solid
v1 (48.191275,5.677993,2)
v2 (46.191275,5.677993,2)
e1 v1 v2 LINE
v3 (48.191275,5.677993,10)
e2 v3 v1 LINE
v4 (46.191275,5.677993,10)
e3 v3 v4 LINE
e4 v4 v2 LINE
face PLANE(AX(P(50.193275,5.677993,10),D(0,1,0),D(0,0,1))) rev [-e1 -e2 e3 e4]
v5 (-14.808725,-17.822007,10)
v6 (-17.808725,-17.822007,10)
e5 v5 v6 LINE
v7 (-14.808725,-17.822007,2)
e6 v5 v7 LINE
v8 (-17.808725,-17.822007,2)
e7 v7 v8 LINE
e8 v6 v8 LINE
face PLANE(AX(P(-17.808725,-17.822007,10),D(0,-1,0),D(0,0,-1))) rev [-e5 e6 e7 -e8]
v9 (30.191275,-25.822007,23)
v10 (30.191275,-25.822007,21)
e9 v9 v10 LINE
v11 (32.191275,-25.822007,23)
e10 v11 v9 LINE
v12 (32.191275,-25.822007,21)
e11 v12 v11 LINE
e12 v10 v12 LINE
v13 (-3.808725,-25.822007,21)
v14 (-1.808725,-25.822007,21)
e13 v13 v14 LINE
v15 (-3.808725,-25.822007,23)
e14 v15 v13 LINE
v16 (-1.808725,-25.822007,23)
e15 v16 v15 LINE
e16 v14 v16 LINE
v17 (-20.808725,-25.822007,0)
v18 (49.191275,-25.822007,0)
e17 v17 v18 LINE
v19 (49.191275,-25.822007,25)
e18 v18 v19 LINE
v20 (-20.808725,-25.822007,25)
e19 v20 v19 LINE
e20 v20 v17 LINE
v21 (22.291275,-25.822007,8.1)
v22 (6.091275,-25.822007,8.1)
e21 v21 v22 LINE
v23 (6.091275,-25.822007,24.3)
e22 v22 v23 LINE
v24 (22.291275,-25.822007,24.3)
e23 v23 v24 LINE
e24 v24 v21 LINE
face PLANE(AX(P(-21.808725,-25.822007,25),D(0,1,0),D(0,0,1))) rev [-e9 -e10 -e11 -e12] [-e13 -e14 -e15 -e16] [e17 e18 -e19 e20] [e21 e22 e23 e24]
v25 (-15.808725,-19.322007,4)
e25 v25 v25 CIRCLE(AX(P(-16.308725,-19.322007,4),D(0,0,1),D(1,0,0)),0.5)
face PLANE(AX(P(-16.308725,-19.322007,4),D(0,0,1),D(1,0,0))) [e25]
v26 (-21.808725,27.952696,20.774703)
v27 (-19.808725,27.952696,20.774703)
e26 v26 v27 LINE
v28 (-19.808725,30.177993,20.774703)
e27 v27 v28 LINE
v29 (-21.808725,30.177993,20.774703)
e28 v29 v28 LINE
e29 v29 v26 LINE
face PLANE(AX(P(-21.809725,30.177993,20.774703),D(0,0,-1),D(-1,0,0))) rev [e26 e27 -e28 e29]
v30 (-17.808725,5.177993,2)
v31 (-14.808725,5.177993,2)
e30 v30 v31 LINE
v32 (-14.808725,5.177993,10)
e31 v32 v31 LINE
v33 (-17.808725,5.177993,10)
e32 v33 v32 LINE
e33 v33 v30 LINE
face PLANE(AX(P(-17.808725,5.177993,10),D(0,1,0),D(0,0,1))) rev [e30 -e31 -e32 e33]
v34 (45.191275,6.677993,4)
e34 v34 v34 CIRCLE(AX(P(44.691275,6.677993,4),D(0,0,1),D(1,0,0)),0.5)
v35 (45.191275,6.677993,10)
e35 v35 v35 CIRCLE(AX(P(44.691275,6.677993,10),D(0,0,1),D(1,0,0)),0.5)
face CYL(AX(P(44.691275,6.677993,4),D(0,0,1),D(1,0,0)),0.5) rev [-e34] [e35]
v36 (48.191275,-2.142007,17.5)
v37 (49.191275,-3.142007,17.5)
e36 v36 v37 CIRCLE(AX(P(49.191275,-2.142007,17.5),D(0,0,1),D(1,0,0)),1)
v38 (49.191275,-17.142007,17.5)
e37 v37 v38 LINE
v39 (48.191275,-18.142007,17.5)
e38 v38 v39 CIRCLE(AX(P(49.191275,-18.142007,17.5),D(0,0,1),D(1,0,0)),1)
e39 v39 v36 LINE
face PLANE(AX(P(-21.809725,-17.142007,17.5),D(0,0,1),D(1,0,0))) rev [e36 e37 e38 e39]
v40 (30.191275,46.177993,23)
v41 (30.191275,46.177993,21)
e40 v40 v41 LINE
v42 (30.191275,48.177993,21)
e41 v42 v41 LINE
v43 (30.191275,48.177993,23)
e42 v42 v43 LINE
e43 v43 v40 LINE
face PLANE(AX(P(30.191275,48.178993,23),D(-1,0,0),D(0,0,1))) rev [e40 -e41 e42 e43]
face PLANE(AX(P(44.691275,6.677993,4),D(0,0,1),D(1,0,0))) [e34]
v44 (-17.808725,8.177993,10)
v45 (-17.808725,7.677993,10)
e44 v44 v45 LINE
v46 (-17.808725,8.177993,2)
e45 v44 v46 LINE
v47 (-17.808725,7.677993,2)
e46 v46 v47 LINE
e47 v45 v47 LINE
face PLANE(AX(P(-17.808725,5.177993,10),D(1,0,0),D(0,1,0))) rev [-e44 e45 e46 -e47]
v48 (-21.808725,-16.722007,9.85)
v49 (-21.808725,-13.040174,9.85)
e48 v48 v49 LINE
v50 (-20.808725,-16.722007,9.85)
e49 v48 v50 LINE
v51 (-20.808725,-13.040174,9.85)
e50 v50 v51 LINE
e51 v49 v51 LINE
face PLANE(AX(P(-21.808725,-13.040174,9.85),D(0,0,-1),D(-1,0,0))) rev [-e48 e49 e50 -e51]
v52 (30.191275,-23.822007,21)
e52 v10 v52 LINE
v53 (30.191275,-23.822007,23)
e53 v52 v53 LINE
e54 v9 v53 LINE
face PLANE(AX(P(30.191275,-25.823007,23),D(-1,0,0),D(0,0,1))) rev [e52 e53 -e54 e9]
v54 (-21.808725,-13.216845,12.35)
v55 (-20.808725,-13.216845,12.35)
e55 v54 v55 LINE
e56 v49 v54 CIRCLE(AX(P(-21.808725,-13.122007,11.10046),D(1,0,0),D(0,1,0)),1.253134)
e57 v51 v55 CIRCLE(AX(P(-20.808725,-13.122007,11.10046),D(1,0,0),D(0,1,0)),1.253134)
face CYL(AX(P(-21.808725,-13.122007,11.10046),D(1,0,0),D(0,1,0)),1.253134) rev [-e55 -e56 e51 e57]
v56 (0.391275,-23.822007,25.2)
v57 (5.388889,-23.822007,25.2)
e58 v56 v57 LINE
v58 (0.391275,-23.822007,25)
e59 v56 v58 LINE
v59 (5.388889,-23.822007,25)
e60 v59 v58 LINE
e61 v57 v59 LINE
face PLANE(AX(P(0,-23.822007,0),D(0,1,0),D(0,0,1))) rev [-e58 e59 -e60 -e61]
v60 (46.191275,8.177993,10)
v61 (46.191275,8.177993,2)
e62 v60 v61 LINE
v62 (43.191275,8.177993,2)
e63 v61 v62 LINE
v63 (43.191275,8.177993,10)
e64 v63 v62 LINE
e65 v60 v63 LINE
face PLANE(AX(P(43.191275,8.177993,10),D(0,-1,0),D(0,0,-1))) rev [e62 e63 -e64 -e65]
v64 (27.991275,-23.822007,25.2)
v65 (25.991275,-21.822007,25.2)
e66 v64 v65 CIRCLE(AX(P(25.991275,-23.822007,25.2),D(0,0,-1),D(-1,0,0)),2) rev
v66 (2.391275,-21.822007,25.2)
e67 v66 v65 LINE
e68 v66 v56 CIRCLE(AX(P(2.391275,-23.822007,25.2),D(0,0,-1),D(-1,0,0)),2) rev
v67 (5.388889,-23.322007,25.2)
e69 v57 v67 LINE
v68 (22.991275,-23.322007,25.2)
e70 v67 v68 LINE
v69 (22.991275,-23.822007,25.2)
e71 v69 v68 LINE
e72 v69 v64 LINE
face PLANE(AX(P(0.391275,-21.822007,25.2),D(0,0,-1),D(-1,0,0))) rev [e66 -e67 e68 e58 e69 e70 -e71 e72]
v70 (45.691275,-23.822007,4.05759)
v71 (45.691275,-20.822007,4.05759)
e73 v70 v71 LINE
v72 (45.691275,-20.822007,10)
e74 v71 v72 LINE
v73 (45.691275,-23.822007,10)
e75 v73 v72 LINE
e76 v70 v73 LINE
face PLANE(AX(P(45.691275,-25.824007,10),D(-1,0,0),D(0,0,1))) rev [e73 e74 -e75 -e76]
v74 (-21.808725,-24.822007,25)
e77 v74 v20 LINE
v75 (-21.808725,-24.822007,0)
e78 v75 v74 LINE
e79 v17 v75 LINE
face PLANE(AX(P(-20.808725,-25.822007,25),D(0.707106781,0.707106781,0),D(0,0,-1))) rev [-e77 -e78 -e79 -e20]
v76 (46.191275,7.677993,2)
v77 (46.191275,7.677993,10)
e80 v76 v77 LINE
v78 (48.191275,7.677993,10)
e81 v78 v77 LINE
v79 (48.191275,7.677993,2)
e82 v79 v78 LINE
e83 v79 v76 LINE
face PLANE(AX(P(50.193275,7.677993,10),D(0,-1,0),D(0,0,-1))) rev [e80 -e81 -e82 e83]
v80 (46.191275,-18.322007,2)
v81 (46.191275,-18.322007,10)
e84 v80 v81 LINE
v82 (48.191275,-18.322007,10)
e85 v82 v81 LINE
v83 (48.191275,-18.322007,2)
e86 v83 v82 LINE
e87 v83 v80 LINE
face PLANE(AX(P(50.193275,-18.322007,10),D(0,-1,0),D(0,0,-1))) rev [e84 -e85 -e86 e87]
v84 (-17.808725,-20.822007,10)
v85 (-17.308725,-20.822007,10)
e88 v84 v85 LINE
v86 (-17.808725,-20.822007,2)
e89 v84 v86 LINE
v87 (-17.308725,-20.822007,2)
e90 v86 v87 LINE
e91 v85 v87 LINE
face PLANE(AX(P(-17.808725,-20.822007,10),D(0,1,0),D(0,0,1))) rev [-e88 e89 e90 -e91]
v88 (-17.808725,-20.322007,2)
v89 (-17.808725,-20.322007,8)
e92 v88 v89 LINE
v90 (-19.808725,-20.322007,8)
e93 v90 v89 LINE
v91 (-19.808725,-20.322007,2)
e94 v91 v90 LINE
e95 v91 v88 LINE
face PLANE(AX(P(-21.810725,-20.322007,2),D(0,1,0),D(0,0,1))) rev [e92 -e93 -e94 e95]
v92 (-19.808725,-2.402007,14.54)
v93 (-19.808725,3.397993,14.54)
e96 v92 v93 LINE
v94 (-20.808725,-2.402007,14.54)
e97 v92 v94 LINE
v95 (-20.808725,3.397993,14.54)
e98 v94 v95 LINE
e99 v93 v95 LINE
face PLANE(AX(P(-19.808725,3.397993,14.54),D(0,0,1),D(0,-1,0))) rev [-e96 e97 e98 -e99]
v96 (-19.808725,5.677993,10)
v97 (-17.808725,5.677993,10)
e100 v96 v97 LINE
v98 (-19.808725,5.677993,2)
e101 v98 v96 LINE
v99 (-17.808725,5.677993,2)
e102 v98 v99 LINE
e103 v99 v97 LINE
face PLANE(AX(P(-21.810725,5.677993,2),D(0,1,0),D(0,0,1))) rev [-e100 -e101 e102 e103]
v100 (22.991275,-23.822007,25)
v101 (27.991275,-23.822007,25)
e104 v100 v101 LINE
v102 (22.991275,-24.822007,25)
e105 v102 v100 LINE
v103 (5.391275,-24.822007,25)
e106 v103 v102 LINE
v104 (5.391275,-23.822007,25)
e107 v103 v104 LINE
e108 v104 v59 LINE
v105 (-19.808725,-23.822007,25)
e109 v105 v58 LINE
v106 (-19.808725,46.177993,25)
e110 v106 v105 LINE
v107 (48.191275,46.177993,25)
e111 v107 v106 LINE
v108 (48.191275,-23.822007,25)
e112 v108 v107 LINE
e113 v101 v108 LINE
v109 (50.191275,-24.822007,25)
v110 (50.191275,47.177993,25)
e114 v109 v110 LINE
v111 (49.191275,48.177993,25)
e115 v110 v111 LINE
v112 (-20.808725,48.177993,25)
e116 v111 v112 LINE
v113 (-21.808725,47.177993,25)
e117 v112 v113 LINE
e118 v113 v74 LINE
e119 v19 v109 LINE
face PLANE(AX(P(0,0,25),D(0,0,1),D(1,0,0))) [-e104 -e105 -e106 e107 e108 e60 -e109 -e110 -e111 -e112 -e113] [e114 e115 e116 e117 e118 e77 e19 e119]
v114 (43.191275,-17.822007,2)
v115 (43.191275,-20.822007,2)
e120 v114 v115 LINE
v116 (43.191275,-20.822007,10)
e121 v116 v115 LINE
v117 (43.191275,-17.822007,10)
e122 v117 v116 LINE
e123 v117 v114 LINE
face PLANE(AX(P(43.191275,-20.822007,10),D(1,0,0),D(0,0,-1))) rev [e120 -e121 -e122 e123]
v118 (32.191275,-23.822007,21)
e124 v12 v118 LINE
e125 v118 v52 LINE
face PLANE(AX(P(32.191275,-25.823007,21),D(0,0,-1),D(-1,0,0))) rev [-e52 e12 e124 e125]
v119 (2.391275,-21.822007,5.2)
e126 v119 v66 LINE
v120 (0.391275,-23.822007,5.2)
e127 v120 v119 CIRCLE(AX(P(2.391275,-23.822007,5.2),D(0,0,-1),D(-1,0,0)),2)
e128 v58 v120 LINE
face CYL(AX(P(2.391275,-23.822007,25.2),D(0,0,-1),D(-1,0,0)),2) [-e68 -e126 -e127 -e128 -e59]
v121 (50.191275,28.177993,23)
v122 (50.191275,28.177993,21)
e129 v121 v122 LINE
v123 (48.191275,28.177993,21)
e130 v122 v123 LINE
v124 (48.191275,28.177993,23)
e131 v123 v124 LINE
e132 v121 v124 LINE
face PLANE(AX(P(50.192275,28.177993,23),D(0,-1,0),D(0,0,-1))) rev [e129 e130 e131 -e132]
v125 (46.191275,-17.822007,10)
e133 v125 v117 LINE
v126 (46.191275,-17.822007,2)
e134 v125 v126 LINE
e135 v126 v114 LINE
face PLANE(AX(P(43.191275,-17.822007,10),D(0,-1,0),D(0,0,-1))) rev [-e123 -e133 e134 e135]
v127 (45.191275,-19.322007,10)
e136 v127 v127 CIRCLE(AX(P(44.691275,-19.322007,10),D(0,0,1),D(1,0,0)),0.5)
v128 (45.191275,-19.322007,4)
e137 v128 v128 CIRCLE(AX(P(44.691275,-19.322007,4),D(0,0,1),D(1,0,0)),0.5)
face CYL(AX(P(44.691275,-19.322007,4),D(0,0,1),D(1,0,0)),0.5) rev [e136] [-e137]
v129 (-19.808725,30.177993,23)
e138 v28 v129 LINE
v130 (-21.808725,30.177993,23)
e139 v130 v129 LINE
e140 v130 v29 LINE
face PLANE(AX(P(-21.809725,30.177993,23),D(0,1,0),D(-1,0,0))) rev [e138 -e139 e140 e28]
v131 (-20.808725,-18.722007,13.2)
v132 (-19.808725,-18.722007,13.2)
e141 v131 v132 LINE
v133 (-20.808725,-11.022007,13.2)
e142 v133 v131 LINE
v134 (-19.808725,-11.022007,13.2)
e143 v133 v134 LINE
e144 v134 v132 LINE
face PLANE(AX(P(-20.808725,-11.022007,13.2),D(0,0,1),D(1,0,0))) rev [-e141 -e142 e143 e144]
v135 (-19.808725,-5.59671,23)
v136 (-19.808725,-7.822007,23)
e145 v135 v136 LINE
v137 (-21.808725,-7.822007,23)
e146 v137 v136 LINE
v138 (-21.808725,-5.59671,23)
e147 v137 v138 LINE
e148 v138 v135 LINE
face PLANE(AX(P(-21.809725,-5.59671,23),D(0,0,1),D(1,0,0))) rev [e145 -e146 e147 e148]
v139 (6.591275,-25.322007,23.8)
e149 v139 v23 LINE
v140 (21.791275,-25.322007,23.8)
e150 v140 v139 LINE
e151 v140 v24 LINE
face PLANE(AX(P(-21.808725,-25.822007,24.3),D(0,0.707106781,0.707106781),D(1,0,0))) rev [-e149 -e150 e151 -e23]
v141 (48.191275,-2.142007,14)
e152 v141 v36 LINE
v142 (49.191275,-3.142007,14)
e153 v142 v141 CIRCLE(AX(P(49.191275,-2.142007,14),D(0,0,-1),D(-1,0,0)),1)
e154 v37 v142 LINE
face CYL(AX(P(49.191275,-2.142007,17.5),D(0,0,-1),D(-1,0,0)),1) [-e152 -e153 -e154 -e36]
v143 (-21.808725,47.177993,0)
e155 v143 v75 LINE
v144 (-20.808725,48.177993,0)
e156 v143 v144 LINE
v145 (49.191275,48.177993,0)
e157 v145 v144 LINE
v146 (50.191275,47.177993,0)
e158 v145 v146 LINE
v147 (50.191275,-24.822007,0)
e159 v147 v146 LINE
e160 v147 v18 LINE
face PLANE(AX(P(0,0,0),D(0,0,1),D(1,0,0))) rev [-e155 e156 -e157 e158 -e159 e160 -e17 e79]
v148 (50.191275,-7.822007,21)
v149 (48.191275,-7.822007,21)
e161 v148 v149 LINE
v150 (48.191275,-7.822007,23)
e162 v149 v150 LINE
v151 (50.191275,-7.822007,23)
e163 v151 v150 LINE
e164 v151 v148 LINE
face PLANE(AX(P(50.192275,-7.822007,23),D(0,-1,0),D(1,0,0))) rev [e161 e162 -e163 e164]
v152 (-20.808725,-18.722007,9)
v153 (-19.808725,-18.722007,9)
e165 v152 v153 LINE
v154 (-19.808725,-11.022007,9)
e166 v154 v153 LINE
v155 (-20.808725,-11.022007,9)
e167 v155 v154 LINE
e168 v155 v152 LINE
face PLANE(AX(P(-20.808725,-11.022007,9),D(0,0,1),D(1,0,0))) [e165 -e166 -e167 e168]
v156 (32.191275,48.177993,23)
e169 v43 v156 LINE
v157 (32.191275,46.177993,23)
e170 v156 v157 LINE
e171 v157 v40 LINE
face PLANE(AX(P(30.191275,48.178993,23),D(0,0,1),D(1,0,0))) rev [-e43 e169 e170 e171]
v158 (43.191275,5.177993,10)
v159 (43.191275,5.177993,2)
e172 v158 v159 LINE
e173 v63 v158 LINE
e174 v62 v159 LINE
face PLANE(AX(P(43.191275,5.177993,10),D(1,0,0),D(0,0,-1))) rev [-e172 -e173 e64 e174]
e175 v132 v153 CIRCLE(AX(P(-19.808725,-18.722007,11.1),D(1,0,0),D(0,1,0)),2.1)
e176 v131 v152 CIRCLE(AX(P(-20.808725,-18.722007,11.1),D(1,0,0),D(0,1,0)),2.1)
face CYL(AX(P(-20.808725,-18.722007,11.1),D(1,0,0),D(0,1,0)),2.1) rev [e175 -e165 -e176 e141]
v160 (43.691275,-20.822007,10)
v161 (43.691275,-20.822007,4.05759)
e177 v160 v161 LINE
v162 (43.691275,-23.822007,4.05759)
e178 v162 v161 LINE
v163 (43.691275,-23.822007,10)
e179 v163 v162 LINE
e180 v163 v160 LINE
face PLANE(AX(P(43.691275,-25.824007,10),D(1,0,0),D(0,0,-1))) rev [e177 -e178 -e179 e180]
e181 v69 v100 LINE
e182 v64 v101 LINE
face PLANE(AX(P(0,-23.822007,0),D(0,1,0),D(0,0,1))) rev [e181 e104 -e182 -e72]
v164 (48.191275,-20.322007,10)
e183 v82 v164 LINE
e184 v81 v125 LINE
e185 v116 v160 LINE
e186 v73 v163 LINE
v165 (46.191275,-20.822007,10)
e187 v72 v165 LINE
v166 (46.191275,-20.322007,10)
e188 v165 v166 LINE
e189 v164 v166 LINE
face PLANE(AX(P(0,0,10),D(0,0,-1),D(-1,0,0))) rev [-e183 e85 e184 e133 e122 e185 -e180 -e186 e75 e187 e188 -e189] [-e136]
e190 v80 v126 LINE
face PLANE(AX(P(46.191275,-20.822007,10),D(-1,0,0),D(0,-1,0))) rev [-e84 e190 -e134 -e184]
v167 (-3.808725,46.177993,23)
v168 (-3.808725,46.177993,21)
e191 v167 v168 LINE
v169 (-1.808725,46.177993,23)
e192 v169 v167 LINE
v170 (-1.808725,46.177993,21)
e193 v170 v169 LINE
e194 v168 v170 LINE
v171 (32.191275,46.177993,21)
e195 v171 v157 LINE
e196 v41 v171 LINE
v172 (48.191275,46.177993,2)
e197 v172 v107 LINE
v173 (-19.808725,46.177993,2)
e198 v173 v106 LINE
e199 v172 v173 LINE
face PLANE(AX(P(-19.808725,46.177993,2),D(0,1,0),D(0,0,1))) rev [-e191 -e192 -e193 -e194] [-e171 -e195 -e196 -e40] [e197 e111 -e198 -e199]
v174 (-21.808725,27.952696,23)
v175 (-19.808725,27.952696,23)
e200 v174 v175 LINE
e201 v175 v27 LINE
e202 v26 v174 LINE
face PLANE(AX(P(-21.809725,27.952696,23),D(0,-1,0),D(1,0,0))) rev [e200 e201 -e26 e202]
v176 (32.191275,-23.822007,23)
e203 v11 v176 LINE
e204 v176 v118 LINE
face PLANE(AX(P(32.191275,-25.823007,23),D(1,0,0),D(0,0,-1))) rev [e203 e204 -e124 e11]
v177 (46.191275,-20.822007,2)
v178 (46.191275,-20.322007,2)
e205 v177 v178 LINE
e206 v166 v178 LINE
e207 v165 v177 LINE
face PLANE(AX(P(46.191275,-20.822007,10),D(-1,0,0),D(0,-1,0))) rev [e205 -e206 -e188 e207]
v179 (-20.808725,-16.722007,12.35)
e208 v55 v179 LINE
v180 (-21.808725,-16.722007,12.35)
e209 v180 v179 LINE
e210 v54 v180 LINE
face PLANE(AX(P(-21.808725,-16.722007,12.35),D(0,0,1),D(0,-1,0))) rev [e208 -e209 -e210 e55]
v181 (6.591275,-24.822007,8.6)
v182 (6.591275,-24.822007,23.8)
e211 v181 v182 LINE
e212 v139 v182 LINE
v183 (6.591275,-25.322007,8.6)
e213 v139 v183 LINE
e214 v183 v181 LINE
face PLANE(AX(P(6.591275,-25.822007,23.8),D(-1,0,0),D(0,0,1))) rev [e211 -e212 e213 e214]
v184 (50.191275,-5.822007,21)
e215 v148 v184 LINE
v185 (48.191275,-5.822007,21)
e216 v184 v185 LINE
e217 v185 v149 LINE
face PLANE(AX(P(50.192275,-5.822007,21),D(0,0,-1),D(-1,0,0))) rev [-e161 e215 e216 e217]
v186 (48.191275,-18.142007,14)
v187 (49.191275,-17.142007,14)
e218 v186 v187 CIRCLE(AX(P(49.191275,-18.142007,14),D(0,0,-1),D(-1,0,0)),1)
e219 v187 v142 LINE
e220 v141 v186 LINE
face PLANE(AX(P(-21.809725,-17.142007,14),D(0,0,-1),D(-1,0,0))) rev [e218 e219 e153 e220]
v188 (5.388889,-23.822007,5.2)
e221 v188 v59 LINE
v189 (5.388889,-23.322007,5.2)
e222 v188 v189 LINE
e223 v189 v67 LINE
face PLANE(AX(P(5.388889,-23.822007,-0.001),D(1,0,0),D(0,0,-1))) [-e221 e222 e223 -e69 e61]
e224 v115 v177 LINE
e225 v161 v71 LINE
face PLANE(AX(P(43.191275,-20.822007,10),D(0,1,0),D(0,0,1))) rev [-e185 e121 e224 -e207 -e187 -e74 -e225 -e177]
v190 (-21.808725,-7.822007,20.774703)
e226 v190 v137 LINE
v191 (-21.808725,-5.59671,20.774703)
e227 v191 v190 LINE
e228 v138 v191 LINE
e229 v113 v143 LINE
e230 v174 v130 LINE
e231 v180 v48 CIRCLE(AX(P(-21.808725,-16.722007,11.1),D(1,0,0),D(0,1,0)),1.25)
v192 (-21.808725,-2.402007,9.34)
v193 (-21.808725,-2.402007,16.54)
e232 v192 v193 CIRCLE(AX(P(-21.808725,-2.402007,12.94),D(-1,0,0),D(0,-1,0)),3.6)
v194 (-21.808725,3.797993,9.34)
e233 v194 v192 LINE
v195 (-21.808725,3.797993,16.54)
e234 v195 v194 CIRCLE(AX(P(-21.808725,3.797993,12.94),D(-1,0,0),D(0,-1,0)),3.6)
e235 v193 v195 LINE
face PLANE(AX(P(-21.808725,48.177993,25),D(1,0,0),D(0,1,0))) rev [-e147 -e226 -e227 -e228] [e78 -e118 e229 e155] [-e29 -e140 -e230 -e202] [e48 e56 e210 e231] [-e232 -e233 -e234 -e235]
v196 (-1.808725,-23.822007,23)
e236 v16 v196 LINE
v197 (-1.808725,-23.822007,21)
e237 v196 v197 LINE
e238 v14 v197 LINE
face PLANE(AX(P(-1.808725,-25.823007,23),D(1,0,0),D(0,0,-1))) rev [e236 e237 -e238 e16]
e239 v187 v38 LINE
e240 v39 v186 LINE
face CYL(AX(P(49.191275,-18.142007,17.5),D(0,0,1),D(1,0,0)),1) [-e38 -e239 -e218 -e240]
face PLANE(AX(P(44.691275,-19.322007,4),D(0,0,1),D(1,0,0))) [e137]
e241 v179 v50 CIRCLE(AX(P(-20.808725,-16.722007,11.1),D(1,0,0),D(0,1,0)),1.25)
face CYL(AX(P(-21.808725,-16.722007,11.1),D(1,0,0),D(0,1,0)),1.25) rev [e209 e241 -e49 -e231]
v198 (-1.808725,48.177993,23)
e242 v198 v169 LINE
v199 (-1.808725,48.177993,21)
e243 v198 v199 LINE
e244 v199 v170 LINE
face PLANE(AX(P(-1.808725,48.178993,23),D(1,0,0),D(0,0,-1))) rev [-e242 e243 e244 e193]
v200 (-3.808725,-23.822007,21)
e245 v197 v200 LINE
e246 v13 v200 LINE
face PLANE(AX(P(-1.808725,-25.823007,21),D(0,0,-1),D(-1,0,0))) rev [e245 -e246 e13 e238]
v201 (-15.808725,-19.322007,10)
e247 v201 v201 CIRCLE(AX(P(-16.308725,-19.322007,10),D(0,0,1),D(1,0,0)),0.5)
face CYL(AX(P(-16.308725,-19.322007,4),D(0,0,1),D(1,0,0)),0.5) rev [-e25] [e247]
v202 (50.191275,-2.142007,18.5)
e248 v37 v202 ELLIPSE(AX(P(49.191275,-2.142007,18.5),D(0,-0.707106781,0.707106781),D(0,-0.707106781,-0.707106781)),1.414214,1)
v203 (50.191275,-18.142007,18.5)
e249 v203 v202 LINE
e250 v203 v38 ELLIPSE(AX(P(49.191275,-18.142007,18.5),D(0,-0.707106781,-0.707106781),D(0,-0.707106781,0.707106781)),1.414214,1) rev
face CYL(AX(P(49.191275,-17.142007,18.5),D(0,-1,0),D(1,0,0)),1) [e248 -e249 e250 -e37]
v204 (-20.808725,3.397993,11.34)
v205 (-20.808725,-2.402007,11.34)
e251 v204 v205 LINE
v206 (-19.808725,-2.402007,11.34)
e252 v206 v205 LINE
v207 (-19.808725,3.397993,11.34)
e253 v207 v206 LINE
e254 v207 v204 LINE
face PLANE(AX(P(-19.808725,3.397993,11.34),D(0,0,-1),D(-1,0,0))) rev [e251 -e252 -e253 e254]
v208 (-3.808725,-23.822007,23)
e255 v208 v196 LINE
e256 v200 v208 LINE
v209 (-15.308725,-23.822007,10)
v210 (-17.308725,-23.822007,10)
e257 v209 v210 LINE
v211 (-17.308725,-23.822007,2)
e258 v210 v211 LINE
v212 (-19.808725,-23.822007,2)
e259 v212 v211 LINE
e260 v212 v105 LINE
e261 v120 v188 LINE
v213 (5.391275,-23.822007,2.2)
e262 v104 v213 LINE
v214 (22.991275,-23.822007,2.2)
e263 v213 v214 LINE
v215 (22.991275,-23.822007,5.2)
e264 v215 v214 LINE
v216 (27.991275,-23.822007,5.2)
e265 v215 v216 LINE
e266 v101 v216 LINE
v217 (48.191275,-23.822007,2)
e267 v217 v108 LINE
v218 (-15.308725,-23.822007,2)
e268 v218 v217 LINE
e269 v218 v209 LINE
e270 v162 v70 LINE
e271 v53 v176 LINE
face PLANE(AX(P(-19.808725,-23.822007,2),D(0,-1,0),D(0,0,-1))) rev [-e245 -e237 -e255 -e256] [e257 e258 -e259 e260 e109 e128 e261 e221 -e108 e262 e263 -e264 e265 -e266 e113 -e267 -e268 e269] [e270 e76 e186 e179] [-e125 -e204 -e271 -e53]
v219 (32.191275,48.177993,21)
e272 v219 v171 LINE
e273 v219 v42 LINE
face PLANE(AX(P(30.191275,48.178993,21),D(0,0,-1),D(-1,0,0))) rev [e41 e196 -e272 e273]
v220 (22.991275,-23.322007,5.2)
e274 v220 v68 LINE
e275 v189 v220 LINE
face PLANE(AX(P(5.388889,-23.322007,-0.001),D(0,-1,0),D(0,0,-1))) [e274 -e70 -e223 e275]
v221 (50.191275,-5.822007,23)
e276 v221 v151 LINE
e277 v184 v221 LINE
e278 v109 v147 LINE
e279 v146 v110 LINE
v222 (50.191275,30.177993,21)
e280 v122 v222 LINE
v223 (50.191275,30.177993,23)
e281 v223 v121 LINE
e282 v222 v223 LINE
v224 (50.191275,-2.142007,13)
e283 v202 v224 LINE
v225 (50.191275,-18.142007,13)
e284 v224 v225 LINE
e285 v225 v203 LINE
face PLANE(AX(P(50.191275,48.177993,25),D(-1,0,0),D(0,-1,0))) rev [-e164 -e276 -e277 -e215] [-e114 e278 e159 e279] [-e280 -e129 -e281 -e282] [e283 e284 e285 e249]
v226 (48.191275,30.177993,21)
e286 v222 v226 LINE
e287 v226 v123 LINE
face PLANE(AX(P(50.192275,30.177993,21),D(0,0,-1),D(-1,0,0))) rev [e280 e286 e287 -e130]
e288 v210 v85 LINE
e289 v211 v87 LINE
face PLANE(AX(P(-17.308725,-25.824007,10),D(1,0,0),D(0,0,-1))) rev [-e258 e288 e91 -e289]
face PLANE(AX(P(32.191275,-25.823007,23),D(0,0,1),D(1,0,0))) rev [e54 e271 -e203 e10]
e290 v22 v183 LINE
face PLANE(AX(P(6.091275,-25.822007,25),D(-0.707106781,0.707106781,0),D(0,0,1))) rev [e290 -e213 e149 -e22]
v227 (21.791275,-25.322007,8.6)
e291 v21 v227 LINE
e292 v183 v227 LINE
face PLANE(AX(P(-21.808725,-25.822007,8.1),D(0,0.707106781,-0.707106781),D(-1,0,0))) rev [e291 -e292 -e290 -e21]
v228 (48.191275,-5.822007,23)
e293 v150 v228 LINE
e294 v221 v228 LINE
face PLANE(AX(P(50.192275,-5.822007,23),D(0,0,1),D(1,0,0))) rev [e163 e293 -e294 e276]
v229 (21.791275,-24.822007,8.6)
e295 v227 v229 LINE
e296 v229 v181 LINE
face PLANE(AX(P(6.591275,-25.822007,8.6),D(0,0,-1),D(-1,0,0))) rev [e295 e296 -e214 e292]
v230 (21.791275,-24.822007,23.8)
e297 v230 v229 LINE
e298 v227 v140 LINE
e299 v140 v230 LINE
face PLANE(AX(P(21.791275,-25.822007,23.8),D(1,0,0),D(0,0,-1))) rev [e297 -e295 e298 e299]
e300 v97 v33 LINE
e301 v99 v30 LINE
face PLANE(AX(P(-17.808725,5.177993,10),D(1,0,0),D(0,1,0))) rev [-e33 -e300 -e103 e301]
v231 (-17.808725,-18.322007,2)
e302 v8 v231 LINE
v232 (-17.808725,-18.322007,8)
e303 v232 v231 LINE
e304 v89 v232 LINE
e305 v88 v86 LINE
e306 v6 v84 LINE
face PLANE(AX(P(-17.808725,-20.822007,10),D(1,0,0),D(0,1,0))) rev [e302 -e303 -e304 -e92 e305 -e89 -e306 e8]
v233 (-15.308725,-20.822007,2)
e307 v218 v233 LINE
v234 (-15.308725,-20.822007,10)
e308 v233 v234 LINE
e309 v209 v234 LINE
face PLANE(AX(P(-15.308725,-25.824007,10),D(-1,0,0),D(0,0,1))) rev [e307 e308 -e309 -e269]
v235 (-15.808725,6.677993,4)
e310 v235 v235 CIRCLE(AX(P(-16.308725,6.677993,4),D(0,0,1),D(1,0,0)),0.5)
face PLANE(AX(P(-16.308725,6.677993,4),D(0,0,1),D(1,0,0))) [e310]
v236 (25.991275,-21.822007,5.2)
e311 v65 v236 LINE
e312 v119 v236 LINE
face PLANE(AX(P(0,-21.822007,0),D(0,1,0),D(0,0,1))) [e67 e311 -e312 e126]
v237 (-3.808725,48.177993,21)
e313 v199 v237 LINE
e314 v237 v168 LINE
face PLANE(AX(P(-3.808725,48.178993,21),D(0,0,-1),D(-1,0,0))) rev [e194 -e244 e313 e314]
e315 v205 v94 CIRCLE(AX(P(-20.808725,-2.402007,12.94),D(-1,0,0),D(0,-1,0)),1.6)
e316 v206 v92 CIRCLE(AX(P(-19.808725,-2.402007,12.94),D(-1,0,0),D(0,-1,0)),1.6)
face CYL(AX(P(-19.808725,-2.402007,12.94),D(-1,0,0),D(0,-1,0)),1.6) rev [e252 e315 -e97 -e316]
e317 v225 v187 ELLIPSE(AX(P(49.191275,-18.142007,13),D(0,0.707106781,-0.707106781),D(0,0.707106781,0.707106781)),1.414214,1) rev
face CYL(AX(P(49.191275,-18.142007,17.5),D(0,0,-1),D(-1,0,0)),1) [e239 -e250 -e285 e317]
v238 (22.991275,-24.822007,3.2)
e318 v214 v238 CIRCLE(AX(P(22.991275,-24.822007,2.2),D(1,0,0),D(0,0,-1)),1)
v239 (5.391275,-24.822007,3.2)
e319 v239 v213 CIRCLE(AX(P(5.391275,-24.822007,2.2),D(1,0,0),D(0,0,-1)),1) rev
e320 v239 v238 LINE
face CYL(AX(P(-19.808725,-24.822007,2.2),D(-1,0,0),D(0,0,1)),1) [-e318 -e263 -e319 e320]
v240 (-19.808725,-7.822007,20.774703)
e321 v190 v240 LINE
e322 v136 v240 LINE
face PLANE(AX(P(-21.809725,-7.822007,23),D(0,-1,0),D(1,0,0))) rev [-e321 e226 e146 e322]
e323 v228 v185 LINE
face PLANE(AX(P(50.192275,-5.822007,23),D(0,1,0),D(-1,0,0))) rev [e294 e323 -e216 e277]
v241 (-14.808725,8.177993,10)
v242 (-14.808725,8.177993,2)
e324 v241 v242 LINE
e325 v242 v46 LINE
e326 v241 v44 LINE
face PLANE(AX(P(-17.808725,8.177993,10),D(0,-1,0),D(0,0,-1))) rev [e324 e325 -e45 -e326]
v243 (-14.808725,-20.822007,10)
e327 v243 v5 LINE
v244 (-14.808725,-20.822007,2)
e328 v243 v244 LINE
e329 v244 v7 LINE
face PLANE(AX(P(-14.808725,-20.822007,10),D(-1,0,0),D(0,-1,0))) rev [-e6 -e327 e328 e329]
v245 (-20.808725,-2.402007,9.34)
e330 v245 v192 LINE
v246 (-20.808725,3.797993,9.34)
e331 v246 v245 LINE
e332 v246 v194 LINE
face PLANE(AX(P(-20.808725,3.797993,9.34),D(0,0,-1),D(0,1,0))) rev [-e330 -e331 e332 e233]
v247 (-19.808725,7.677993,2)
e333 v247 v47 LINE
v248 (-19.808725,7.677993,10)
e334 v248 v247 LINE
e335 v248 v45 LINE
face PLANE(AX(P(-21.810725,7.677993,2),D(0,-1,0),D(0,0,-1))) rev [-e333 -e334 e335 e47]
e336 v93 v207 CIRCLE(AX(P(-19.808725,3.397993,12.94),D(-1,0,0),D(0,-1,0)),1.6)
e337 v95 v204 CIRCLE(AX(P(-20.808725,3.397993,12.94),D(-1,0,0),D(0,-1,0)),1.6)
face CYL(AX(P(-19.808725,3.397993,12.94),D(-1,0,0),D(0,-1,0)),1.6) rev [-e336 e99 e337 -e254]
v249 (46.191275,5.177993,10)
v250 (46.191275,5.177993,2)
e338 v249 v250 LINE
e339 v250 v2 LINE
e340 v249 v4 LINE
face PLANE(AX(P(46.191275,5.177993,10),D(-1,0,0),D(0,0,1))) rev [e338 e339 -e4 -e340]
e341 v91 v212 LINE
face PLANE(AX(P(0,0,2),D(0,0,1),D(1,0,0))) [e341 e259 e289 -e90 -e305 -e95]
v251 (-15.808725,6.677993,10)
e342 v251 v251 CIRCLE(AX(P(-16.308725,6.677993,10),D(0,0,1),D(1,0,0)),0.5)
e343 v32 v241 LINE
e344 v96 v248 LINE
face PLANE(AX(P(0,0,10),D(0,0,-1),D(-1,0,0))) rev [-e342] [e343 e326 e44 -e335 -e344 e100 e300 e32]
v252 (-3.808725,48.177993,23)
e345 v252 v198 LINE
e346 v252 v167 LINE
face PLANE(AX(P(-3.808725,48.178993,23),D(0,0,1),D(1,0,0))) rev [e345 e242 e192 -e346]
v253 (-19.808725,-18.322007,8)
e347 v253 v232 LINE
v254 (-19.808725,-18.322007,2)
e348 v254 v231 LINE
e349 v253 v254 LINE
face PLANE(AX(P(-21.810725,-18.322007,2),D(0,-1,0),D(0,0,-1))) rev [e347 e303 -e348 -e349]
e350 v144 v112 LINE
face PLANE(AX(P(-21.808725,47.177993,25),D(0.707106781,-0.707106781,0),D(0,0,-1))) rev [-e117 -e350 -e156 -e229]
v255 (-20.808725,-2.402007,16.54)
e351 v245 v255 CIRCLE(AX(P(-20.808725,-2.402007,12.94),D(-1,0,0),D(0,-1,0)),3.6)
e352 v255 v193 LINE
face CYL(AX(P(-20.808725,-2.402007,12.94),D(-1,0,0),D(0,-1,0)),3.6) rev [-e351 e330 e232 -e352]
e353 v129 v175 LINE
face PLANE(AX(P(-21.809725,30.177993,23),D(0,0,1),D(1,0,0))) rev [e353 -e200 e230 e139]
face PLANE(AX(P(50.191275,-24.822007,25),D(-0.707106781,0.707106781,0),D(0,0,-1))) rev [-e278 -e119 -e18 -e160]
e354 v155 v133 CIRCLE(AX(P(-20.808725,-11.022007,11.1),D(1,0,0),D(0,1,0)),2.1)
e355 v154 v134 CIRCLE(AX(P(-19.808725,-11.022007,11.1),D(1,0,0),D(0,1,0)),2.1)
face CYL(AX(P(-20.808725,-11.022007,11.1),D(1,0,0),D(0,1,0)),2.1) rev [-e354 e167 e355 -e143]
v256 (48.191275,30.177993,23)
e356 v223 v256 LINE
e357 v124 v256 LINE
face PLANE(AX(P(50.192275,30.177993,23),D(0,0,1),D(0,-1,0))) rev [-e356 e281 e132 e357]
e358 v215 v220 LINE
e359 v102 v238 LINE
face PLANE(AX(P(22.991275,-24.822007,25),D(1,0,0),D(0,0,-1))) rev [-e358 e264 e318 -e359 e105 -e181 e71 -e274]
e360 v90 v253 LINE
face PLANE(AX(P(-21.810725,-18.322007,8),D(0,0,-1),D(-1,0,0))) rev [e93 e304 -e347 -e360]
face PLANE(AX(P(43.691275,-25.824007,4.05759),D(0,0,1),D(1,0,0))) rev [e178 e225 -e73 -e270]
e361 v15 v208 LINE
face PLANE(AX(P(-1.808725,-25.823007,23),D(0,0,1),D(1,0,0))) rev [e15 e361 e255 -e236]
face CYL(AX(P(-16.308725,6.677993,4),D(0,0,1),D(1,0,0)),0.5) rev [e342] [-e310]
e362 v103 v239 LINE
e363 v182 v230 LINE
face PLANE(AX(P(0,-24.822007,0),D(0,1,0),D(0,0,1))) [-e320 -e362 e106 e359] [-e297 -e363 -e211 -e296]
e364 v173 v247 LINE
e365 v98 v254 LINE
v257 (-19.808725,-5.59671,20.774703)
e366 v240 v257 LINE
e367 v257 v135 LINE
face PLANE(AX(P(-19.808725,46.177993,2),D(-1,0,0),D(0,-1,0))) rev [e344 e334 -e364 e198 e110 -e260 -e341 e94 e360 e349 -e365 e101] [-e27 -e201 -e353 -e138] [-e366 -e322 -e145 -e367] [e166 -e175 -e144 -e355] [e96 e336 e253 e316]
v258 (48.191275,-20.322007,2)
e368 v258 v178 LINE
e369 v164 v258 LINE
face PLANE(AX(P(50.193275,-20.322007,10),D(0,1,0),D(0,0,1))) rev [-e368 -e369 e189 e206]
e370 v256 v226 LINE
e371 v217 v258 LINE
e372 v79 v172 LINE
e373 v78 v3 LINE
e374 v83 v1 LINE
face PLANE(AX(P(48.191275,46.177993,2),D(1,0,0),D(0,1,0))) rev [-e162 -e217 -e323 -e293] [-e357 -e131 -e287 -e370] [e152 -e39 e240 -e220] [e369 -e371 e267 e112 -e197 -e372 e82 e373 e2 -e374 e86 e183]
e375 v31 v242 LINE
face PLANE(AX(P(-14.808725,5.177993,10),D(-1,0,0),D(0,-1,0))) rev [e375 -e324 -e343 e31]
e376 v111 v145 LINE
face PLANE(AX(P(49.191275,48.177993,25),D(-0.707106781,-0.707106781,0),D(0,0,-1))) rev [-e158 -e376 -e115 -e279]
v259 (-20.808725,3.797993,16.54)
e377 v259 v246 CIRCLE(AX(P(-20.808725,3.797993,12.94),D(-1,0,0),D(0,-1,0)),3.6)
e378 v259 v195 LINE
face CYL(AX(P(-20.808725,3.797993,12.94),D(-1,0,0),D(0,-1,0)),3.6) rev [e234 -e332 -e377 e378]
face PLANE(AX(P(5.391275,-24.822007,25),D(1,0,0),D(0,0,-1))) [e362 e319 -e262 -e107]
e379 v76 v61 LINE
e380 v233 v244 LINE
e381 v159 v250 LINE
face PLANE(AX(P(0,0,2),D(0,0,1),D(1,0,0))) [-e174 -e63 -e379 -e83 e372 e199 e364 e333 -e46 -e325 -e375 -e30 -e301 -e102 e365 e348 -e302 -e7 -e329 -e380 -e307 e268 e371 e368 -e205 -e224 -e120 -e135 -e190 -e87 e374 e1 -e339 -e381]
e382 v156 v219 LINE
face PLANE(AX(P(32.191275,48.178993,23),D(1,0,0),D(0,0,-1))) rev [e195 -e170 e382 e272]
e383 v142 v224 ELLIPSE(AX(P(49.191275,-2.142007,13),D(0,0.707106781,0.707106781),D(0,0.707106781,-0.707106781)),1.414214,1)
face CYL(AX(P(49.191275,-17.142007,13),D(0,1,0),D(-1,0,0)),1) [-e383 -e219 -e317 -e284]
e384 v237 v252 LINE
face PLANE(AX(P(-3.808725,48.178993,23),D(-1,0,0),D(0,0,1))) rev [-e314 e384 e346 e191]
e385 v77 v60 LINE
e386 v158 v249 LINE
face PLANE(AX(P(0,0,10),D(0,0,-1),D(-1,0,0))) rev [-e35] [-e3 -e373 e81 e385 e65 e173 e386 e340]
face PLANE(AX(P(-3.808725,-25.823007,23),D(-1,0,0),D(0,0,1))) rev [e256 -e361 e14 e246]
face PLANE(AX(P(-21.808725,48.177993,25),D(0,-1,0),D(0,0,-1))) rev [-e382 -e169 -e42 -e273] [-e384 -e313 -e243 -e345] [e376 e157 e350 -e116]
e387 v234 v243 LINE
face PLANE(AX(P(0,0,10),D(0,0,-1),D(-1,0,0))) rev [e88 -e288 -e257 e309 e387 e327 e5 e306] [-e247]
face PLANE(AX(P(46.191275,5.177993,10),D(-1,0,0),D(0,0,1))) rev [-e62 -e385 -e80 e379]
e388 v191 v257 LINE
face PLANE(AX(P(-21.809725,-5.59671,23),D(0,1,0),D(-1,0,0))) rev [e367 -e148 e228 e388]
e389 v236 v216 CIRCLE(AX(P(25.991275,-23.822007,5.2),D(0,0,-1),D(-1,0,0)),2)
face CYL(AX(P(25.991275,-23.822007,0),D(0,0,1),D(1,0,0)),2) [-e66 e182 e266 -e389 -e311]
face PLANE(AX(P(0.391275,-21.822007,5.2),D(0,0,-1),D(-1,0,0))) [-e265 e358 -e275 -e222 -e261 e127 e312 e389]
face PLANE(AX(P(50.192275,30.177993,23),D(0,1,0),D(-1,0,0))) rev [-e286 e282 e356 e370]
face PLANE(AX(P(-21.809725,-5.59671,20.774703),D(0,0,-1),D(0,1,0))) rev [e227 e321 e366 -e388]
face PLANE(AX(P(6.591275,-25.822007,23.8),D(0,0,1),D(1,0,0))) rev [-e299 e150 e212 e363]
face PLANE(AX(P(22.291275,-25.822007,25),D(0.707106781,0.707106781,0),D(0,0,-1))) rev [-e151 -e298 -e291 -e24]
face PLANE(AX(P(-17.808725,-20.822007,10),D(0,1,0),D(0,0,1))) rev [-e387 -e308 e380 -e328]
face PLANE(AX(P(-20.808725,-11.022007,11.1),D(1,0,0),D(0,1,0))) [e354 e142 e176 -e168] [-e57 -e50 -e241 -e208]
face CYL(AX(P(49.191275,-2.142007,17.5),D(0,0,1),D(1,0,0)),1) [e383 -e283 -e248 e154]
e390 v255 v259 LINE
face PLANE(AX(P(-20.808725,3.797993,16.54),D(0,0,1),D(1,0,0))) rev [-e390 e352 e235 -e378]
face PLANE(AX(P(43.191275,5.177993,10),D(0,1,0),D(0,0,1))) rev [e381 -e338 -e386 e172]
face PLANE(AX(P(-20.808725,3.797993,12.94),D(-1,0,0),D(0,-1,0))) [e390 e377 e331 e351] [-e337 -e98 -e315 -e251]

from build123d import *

# Parameters (mm, degrees)
SKETCH_1_W           = 72
SKETCH_1_H           = 74
EXTRUDE_1_DEPTH      = 25
SKETCH_2_W           = 68
SKETCH_2_H           = 70
CUT_EXTRUDE_1_DEPTH  = 23
CUT_EXTRUDE_2_REACH  = 93.259
SKETCH_3_W           = 2
SKETCH_3_H           = 2
CUT_EXTRUDE_3_REACH  = 90.578
SKETCH_4_W           = 2
SKETCH_4_H           = 2
CUT_EXTRUDE_4_REACH  = 93.259
SKETCH_5_W           = 2
SKETCH_5_H           = 2
CUT_EXTRUDE_5_REACH  = 90.578
SKETCH_6_W           = 2.225296774
SKETCH_6_H           = 2.225296773
SKETCH_6_H_2         = 2.225296774
SKETCH_7_W           = 3
SKETCH_7_H           = 3
EXTRUDE_2_DEPTH      = 8
SKETCH_10_R          = 0.5
CUT_EXTRUDE_6_DEPTH  = 6
EXTRUDE_3_REACH      = 89.006
SKETCH_12_W          = 6
SKETCH_12_H          = 2
SKETCH_12_W_2        = 8
EXTRUDE_4_REACH      = 89.006
SKETCH_13_W          = 8
SKETCH_13_H          = 2
EXTRUDE_5_REACH      = 90.911
SKETCH_14_W          = 2
SKETCH_14_H          = 8
SKETCH_14_H_2        = 5.942409556
CUT_EXTRUDE_8_DEPTH  = 1
CUT_EXTRUDE_9_DEPTH  = 1
CUT_EXTRUDE_10_DEPTH = 1
CUT_EXTRUDE_11_DEPTH = 1
CUT_EXTRUDE_12_REACH = 92.167
SKETCH_21_W          = 3.5
SKETCH_21_H          = 14
SKETCH_22_W          = 17.6
SKETCH_22_H          = 21.8
CUT_EXTRUDE_13_DEPTH = 1
SKETCH_24_W          = 15.2
SKETCH_24_H          = 15.2
CUT_EXTRUDE_14_DEPTH = 1
SKETCH_27_W          = 27.6
SKETCH_27_H          = 20
EXTRUDE_6_DEPTH      = 2
CUT_EXTRUDE_16_REACH = 75.995
SKETCH_28_W          = 17.602386018
SKETCH_28_H          = 0.5
FILLET_1_R           = 1
FILLET_2_R           = 2
CHAMFER_1_SIZE       = 1
FILLET_3_R           = 1
FILLET_4_R           = 1
CHAMFER_3_SIZE       = 0.5


with BuildPart() as part:
    # 草图1 → 凸台-拉伸1 (new body)
    with BuildSketch(Plane.XY):
        with Locations((14.191275168, 11.177993267)):
            Rectangle(SKETCH_1_W, SKETCH_1_H)
    extrude(amount=EXTRUDE_1_DEPTH)

    # 草图2 → 切除-拉伸1 (cut)
    with BuildSketch(Plane.XY.offset(25)):
        with Locations((14.191275168, 11.177993267)):
            Rectangle(SKETCH_2_W, SKETCH_2_H)
    extrude(amount=-CUT_EXTRUDE_1_DEPTH, mode=Mode.SUBTRACT)

    # 草图3 → 切除-拉伸2 (cut, up to next)
    with BuildSketch(Plane.XZ.offset(-46.177993267), mode=Mode.PRIVATE) as cut_extrude_2_sk1:
        with Locations((-2.808724832, 22)):
            Rectangle(SKETCH_3_W, SKETCH_3_H)
    cut_extrude_2_tool1 = extrude(cut_extrude_2_sk1.sketch, amount=-CUT_EXTRUDE_2_REACH, mode=Mode.PRIVATE) & part.part
    # 草图3 → 切除-拉伸2 (cut, up to next)
    with BuildSketch(Plane.XZ.offset(-46.177993267), mode=Mode.PRIVATE) as cut_extrude_2_sk2:
        with Locations((31.191275168, 22)):
            Rectangle(SKETCH_3_W, SKETCH_3_H)
    cut_extrude_2_tool2 = extrude(cut_extrude_2_sk2.sketch, amount=-CUT_EXTRUDE_2_REACH, mode=Mode.PRIVATE) & part.part
    add(cut_extrude_2_tool1.solids().sort_by_distance((-2.808725, 46.177993, 22))[0], mode=Mode.SUBTRACT)
    add(cut_extrude_2_tool2.solids().sort_by_distance((31.191275, 46.177993, 22))[0], mode=Mode.SUBTRACT)

    # 草图4 → 切除-拉伸3 (cut, up to next)
    with BuildSketch(Plane.ZY.offset(-48.191275168), mode=Mode.PRIVATE) as cut_extrude_3_sk1:
        with Locations((22, 29.177993267)):
            Rectangle(SKETCH_4_W, SKETCH_4_H)
    cut_extrude_3_tool1 = extrude(cut_extrude_3_sk1.sketch, amount=-CUT_EXTRUDE_3_REACH, mode=Mode.PRIVATE) & part.part
    # 草图4 → 切除-拉伸3 (cut, up to next)
    with BuildSketch(Plane.ZY.offset(-48.191275168), mode=Mode.PRIVATE) as cut_extrude_3_sk2:
        with Locations((22, -6.822006733)):
            Rectangle(SKETCH_4_W, SKETCH_4_H)
    cut_extrude_3_tool2 = extrude(cut_extrude_3_sk2.sketch, amount=-CUT_EXTRUDE_3_REACH, mode=Mode.PRIVATE) & part.part
    add(cut_extrude_3_tool1.solids().sort_by_distance((48.191275, 29.177993, 22))[0], mode=Mode.SUBTRACT)
    add(cut_extrude_3_tool2.solids().sort_by_distance((48.191275, -6.822007, 22))[0], mode=Mode.SUBTRACT)

    # 草图5 → 切除-拉伸4 (cut, up to next)
    with BuildSketch(Plane(origin=(0, -23.822006733, 0), x_dir=(1, 0, 0), z_dir=(0, 1, 0)), mode=Mode.PRIVATE) as cut_extrude_4_sk1:
        with Locations((31.191275168, -22)):
            Rectangle(SKETCH_5_W, SKETCH_5_H)
    cut_extrude_4_tool1 = extrude(cut_extrude_4_sk1.sketch, amount=-CUT_EXTRUDE_4_REACH, mode=Mode.PRIVATE) & part.part
    # 草图5 → 切除-拉伸4 (cut, up to next)
    with BuildSketch(Plane(origin=(0, -23.822006733, 0), x_dir=(1, 0, 0), z_dir=(0, 1, 0)), mode=Mode.PRIVATE) as cut_extrude_4_sk2:
        with Locations((-2.808724832, -22)):
            Rectangle(SKETCH_5_W, SKETCH_5_H)
    cut_extrude_4_tool2 = extrude(cut_extrude_4_sk2.sketch, amount=-CUT_EXTRUDE_4_REACH, mode=Mode.PRIVATE) & part.part
    add(cut_extrude_4_tool1.solids().sort_by_distance((31.191275, -23.822007, 22))[0], mode=Mode.SUBTRACT)
    add(cut_extrude_4_tool2.solids().sort_by_distance((-2.808725, -23.822007, 22))[0], mode=Mode.SUBTRACT)

    # 草图6 → 切除-拉伸5 (cut, up to next)
    with BuildSketch(Plane(origin=(-19.808724832, 0, 0), x_dir=(0, 0, -1), z_dir=(1, 0, 0)), mode=Mode.PRIVATE) as cut_extrude_5_sk1:
        with Locations((-21.887351613, 29.06534488)):
            Rectangle(SKETCH_6_W, SKETCH_6_H)
    cut_extrude_5_tool1 = extrude(cut_extrude_5_sk1.sketch, amount=-CUT_EXTRUDE_5_REACH, mode=Mode.PRIVATE) & part.part
    # 草图6 → 切除-拉伸5 (cut, up to next)
    with BuildSketch(Plane(origin=(-19.808724832, 0, 0), x_dir=(0, 0, -1), z_dir=(1, 0, 0)), mode=Mode.PRIVATE) as cut_extrude_5_sk2:
        with Locations((-21.887351613, -6.709358346)):
            Rectangle(SKETCH_6_W, SKETCH_6_H_2)
    cut_extrude_5_tool2 = extrude(cut_extrude_5_sk2.sketch, amount=-CUT_EXTRUDE_5_REACH, mode=Mode.PRIVATE) & part.part
    add(cut_extrude_5_tool1.solids().sort_by_distance((-19.808725, 29.065345, 21.887352))[0], mode=Mode.SUBTRACT)
    add(cut_extrude_5_tool2.solids().sort_by_distance((-19.808725, -6.709358, 21.887352))[0], mode=Mode.SUBTRACT)

    # 草图7 → 凸台-拉伸2 (add)
    with BuildSketch(Plane.XY.offset(2)):
        with Locations((-16.308724832, -19.322006733)):
            Rectangle(SKETCH_7_W, SKETCH_7_H)
        with Locations((-16.308724832, 6.677993267)):
            Rectangle(SKETCH_7_W, SKETCH_7_H)
        with Locations((44.691275168, -19.322006733)):
            Rectangle(SKETCH_7_W, SKETCH_7_H)
        with Locations((44.691275168, 6.677993267)):
            Rectangle(SKETCH_7_W, SKETCH_7_H)
    extrude(amount=EXTRUDE_2_DEPTH)

    # 草图10 → 切除-拉伸6 (cut)
    with BuildSketch(Plane.XY.offset(10)):
        with Locations((44.691275168, 6.677993267)):
            Circle(SKETCH_10_R)
        with Locations((44.691275168, -19.322006733)):
            Circle(SKETCH_10_R)
        with Locations((-16.308724832, -19.322006733)):
            Circle(SKETCH_10_R)
        with Locations((-16.308724832, 6.677993267)):
            Circle(SKETCH_10_R)
    extrude(amount=-CUT_EXTRUDE_6_DEPTH, mode=Mode.SUBTRACT)

    # 草图12 → 凸台-拉伸3 (add, up to next)
    with BuildSketch(Plane.ZY.offset(17.808724832), mode=Mode.PRIVATE) as extrude_3_sk1:
        with Locations((5, -19.322006733)):
            Rectangle(SKETCH_12_W, SKETCH_12_H)
    extrude_3_tool1 = extrude(extrude_3_sk1.sketch, amount=EXTRUDE_3_REACH, mode=Mode.PRIVATE) - part.part
    # 草图12 → 凸台-拉伸3 (add, up to next)
    with BuildSketch(Plane.ZY.offset(17.808724832), mode=Mode.PRIVATE) as extrude_3_sk2:
        with Locations((6, 6.677993267)):
            Rectangle(SKETCH_12_W_2, SKETCH_12_H)
    extrude_3_tool2 = extrude(extrude_3_sk2.sketch, amount=EXTRUDE_3_REACH, mode=Mode.PRIVATE) - part.part
    add(extrude_3_tool1.solids().sort_by_distance((-17.808725, -19.322007, 5))[0])
    add(extrude_3_tool2.solids().sort_by_distance((-17.808725, 6.677993, 6))[0])

    # 草图13 → 凸台-拉伸4 (add, up to next)
    with BuildSketch(Plane(origin=(46.191275168, 0, 0), x_dir=(0, 0, -1), z_dir=(1, 0, 0)), mode=Mode.PRIVATE) as extrude_4_sk1:
        with Locations((-6, 6.677993267)):
            Rectangle(SKETCH_13_W, SKETCH_13_H)
    extrude_4_tool1 = extrude(extrude_4_sk1.sketch, amount=EXTRUDE_4_REACH, mode=Mode.PRIVATE) - part.part
    # 草图13 → 凸台-拉伸4 (add, up to next)
    with BuildSketch(Plane(origin=(46.191275168, 0, 0), x_dir=(0, 0, -1), z_dir=(1, 0, 0)), mode=Mode.PRIVATE) as extrude_4_sk2:
        with Locations((-6, -19.322006733)):
            Rectangle(SKETCH_13_W, SKETCH_13_H)
    extrude_4_tool2 = extrude(extrude_4_sk2.sketch, amount=EXTRUDE_4_REACH, mode=Mode.PRIVATE) - part.part
    add(extrude_4_tool1.solids().sort_by_distance((46.191275, 6.677993, 6))[0])
    add(extrude_4_tool2.solids().sort_by_distance((46.191275, -19.322007, 6))[0])

    # 草图14 → 凸台-拉伸5 (add, up to next)
    with BuildSketch(Plane.XZ.offset(20.822006733), mode=Mode.PRIVATE) as extrude_5_sk1:
        with Locations((-16.308724832, 6)):
            Rectangle(SKETCH_14_W, SKETCH_14_H)
    extrude_5_tool1 = extrude(extrude_5_sk1.sketch, amount=EXTRUDE_5_REACH, mode=Mode.PRIVATE) - part.part
    # 草图14 → 凸台-拉伸5 (add, up to next)
    with BuildSketch(Plane.XZ.offset(20.822006733), mode=Mode.PRIVATE) as extrude_5_sk2:
        with Locations((44.691275168, 7.028795222)):
            Rectangle(SKETCH_14_W, SKETCH_14_H_2)
    extrude_5_tool2 = extrude(extrude_5_sk2.sketch, amount=EXTRUDE_5_REACH, mode=Mode.PRIVATE) - part.part
    add(extrude_5_tool1.solids().sort_by_distance((-16.308725, -20.822007, 6))[0])
    add(extrude_5_tool2.solids().sort_by_distance((44.691275, -20.822007, 7.028795))[0])

    # 草图15 → 切除-拉伸8 (cut)
    with BuildSketch(Plane.ZY.offset(21.808724832)):
        with BuildLine():
            Line((16.54, 3.797993267), (16.54, -2.402006733))
            ThreePointArc((16.54, -2.402006733), (12.94, -6.002006733), (9.34, -2.402006733))
            Line((9.34, -2.402006733), (9.34, 3.797993267))
            ThreePointArc((9.34, 3.797993267), (12.94, 7.397993267), (16.54, 3.797993267))
        make_face()
    extrude(amount=-CUT_EXTRUDE_8_DEPTH, mode=Mode.SUBTRACT)

    # 草图18 → 切除-拉伸9 (cut)
    with BuildSketch(Plane.ZY.offset(20.808724832)):
        with BuildLine():
            Line((14.54, 3.397993267), (14.54, -2.402006733))
            ThreePointArc((14.54, -2.402006733), (12.94, -4.002006733), (11.34, -2.402006733))
            Line((11.34, -2.402006733), (11.34, 3.397993267))
            ThreePointArc((11.34, 3.397993267), (12.94, 4.997993267), (14.54, 3.397993267))
        make_face()
    extrude(amount=-CUT_EXTRUDE_9_DEPTH, mode=Mode.SUBTRACT)

    # 草图19 → 切除-拉伸10 (cut)
    with BuildSketch(Plane(origin=(-19.808724832, 0, 0), x_dir=(0, 0, -1), z_dir=(1, 0, 0))):
        with BuildLine():
            Line((-9, -11.022006733), (-9, -18.722006733))
            ThreePointArc((-9, -18.722006733), (-11.1, -20.822006733), (-13.2, -18.722006733))
            Line((-13.2, -18.722006733), (-13.2, -11.022006733))
            ThreePointArc((-13.2, -11.022006733), (-11.1, -8.922006733), (-9, -11.022006733))
        make_face()
    extrude(amount=-CUT_EXTRUDE_10_DEPTH, mode=Mode.SUBTRACT)

    # 草图20 → 切除-拉伸11 (cut)
    with BuildSketch(Plane(origin=(-20.808724832, 0, 0), x_dir=(0, 0, -1), z_dir=(1, 0, 0))):
        with BuildLine():
            Line((-12.35, -16.722006733), (-12.35, -13.216845353))
            ThreePointArc((-12.35, -13.216845353), (-11.188796635, -11.871989848), (-9.85, -13.040173546))
            Line((-9.85, -13.040173546), (-9.85, -16.722006733))
            ThreePointArc((-9.85, -16.722006733), (-11.1, -17.972006733), (-12.35, -16.722006733))
        make_face()
    extrude(amount=-CUT_EXTRUDE_11_DEPTH, mode=Mode.SUBTRACT)

    # 草图21 → 切除-拉伸12 (cut, up to next)
    with BuildSketch(Plane(origin=(50.191275168, 0, 0), x_dir=(0, 0, -1), z_dir=(1, 0, 0)), mode=Mode.PRIVATE) as cut_extrude_12_sk1:
        with Locations((-15.75, -10.142006733)):
            Rectangle(SKETCH_21_W, SKETCH_21_H)
    cut_extrude_12_tool1 = extrude(cut_extrude_12_sk1.sketch, amount=-CUT_EXTRUDE_12_REACH, mode=Mode.PRIVATE) & part.part
    add(cut_extrude_12_tool1.solids().sort_by_distance((50.191275, -10.142007, 15.75))[0], mode=Mode.SUBTRACT)

    # 草图22 → 切除-拉伸13 (cut)
    with BuildSketch(Plane(origin=(0, -23.822006733, 0), x_dir=(1, 0, 0), z_dir=(0, 1, 0))):
        with Locations((14.191275168, -14.1)):
            Rectangle(SKETCH_22_W, SKETCH_22_H)
    extrude(amount=-CUT_EXTRUDE_13_DEPTH, mode=Mode.SUBTRACT)

    # 草图24 → 切除-拉伸14 (cut)
    with BuildSketch(Plane(origin=(0, -24.822006733, 0), x_dir=(1, 0, 0), z_dir=(0, 1, 0))):
        with Locations((14.191275168, -16.2)):
            Rectangle(SKETCH_24_W, SKETCH_24_H)
    extrude(amount=-CUT_EXTRUDE_14_DEPTH, mode=Mode.SUBTRACT)

    # 草图27 → 凸台-拉伸6 (add)
    with BuildSketch(Plane(origin=(0, -23.822006733, 0), x_dir=(1, 0, 0), z_dir=(0, 1, 0))):
        with Locations((14.191275168, -15.2)):
            Rectangle(SKETCH_27_W, SKETCH_27_H)
    extrude(amount=EXTRUDE_6_DEPTH)

    # 草图28 → 切除-拉伸16 (cut, up to next)
    with BuildSketch(Plane.XY.offset(25.2), mode=Mode.PRIVATE) as cut_extrude_16_sk1:
        with Locations((14.190082159, -23.572006733)):
            Rectangle(SKETCH_28_W, SKETCH_28_H)
    cut_extrude_16_tool1 = extrude(cut_extrude_16_sk1.sketch, amount=-CUT_EXTRUDE_16_REACH, mode=Mode.PRIVATE) & part.part
    add(cut_extrude_16_tool1.solids().sort_by_distance((14.190082, -23.572007, 25.2))[0], mode=Mode.SUBTRACT)

    # 圆角1
    fillet_1_edges = [part.edges().sort_by_distance(p)[0] for p in [
        (14.191275168, -23.822006733, 3.2),
    ]]
    fillet(fillet_1_edges, radius=FILLET_1_R - 0.0001)  # a hair under: the kernel refuses the full size

    # 圆角2
    fillet_2_edges = [part.edges().sort_by_distance(p)[0] for p in [
        (0.391275168, -21.822006733, 15.2),
        (27.991275168, -21.822006733, 15.2),
    ]]
    fillet(fillet_2_edges, radius=FILLET_2_R - 0.0001)  # a hair under: the kernel refuses the full size

    # 倒角1
    chamfer_1_edges = [part.edges().sort_by_distance(p)[0] for p in [
        (-21.808724832, 48.177993267, 12.5),
        (50.191275168, 48.177993267, 12.5),
        (50.191275168, -25.822006733, 12.5),
        (-21.808724832, -25.822006733, 12.5),
    ]]
    chamfer(chamfer_1_edges, length=CHAMFER_1_SIZE)

    # 圆角3
    fillet_3_edges = [part.edges().sort_by_distance(p)[0] for p in [
        (48.191275168, -17.142006733, 15.75),
        (48.191275168, -3.142006733, 15.75),
    ]]
    fillet(fillet_3_edges, radius=FILLET_3_R)

    # 圆角4
    fillet_4_edges = [part.edges().sort_by_distance(p)[0] for p in [
        (50.191275168, -10.142006733, 17.5),
        (50.191275168, -10.142006733, 14),
        (50.191275168, -17.142006733, 15.75),
        (50.191275168, -3.142006733, 15.75),
    ]]
    fillet(fillet_4_edges, radius=FILLET_4_R - 0.0001)  # a hair under: the kernel refuses the full size

    # 倒角3
    chamfer_3_edges = [part.edges().sort_by_distance(p)[0] for p in [
        (6.591275168, -25.822006733, 16.2),
        (14.191275168, -25.822006733, 8.6),
        (21.791275168, -25.822006733, 16.2),
        (14.191275168, -25.822006733, 23.8),
    ]]
    chamfer(chamfer_3_edges, length=CHAMFER_3_SIZE)


solid = part.part
